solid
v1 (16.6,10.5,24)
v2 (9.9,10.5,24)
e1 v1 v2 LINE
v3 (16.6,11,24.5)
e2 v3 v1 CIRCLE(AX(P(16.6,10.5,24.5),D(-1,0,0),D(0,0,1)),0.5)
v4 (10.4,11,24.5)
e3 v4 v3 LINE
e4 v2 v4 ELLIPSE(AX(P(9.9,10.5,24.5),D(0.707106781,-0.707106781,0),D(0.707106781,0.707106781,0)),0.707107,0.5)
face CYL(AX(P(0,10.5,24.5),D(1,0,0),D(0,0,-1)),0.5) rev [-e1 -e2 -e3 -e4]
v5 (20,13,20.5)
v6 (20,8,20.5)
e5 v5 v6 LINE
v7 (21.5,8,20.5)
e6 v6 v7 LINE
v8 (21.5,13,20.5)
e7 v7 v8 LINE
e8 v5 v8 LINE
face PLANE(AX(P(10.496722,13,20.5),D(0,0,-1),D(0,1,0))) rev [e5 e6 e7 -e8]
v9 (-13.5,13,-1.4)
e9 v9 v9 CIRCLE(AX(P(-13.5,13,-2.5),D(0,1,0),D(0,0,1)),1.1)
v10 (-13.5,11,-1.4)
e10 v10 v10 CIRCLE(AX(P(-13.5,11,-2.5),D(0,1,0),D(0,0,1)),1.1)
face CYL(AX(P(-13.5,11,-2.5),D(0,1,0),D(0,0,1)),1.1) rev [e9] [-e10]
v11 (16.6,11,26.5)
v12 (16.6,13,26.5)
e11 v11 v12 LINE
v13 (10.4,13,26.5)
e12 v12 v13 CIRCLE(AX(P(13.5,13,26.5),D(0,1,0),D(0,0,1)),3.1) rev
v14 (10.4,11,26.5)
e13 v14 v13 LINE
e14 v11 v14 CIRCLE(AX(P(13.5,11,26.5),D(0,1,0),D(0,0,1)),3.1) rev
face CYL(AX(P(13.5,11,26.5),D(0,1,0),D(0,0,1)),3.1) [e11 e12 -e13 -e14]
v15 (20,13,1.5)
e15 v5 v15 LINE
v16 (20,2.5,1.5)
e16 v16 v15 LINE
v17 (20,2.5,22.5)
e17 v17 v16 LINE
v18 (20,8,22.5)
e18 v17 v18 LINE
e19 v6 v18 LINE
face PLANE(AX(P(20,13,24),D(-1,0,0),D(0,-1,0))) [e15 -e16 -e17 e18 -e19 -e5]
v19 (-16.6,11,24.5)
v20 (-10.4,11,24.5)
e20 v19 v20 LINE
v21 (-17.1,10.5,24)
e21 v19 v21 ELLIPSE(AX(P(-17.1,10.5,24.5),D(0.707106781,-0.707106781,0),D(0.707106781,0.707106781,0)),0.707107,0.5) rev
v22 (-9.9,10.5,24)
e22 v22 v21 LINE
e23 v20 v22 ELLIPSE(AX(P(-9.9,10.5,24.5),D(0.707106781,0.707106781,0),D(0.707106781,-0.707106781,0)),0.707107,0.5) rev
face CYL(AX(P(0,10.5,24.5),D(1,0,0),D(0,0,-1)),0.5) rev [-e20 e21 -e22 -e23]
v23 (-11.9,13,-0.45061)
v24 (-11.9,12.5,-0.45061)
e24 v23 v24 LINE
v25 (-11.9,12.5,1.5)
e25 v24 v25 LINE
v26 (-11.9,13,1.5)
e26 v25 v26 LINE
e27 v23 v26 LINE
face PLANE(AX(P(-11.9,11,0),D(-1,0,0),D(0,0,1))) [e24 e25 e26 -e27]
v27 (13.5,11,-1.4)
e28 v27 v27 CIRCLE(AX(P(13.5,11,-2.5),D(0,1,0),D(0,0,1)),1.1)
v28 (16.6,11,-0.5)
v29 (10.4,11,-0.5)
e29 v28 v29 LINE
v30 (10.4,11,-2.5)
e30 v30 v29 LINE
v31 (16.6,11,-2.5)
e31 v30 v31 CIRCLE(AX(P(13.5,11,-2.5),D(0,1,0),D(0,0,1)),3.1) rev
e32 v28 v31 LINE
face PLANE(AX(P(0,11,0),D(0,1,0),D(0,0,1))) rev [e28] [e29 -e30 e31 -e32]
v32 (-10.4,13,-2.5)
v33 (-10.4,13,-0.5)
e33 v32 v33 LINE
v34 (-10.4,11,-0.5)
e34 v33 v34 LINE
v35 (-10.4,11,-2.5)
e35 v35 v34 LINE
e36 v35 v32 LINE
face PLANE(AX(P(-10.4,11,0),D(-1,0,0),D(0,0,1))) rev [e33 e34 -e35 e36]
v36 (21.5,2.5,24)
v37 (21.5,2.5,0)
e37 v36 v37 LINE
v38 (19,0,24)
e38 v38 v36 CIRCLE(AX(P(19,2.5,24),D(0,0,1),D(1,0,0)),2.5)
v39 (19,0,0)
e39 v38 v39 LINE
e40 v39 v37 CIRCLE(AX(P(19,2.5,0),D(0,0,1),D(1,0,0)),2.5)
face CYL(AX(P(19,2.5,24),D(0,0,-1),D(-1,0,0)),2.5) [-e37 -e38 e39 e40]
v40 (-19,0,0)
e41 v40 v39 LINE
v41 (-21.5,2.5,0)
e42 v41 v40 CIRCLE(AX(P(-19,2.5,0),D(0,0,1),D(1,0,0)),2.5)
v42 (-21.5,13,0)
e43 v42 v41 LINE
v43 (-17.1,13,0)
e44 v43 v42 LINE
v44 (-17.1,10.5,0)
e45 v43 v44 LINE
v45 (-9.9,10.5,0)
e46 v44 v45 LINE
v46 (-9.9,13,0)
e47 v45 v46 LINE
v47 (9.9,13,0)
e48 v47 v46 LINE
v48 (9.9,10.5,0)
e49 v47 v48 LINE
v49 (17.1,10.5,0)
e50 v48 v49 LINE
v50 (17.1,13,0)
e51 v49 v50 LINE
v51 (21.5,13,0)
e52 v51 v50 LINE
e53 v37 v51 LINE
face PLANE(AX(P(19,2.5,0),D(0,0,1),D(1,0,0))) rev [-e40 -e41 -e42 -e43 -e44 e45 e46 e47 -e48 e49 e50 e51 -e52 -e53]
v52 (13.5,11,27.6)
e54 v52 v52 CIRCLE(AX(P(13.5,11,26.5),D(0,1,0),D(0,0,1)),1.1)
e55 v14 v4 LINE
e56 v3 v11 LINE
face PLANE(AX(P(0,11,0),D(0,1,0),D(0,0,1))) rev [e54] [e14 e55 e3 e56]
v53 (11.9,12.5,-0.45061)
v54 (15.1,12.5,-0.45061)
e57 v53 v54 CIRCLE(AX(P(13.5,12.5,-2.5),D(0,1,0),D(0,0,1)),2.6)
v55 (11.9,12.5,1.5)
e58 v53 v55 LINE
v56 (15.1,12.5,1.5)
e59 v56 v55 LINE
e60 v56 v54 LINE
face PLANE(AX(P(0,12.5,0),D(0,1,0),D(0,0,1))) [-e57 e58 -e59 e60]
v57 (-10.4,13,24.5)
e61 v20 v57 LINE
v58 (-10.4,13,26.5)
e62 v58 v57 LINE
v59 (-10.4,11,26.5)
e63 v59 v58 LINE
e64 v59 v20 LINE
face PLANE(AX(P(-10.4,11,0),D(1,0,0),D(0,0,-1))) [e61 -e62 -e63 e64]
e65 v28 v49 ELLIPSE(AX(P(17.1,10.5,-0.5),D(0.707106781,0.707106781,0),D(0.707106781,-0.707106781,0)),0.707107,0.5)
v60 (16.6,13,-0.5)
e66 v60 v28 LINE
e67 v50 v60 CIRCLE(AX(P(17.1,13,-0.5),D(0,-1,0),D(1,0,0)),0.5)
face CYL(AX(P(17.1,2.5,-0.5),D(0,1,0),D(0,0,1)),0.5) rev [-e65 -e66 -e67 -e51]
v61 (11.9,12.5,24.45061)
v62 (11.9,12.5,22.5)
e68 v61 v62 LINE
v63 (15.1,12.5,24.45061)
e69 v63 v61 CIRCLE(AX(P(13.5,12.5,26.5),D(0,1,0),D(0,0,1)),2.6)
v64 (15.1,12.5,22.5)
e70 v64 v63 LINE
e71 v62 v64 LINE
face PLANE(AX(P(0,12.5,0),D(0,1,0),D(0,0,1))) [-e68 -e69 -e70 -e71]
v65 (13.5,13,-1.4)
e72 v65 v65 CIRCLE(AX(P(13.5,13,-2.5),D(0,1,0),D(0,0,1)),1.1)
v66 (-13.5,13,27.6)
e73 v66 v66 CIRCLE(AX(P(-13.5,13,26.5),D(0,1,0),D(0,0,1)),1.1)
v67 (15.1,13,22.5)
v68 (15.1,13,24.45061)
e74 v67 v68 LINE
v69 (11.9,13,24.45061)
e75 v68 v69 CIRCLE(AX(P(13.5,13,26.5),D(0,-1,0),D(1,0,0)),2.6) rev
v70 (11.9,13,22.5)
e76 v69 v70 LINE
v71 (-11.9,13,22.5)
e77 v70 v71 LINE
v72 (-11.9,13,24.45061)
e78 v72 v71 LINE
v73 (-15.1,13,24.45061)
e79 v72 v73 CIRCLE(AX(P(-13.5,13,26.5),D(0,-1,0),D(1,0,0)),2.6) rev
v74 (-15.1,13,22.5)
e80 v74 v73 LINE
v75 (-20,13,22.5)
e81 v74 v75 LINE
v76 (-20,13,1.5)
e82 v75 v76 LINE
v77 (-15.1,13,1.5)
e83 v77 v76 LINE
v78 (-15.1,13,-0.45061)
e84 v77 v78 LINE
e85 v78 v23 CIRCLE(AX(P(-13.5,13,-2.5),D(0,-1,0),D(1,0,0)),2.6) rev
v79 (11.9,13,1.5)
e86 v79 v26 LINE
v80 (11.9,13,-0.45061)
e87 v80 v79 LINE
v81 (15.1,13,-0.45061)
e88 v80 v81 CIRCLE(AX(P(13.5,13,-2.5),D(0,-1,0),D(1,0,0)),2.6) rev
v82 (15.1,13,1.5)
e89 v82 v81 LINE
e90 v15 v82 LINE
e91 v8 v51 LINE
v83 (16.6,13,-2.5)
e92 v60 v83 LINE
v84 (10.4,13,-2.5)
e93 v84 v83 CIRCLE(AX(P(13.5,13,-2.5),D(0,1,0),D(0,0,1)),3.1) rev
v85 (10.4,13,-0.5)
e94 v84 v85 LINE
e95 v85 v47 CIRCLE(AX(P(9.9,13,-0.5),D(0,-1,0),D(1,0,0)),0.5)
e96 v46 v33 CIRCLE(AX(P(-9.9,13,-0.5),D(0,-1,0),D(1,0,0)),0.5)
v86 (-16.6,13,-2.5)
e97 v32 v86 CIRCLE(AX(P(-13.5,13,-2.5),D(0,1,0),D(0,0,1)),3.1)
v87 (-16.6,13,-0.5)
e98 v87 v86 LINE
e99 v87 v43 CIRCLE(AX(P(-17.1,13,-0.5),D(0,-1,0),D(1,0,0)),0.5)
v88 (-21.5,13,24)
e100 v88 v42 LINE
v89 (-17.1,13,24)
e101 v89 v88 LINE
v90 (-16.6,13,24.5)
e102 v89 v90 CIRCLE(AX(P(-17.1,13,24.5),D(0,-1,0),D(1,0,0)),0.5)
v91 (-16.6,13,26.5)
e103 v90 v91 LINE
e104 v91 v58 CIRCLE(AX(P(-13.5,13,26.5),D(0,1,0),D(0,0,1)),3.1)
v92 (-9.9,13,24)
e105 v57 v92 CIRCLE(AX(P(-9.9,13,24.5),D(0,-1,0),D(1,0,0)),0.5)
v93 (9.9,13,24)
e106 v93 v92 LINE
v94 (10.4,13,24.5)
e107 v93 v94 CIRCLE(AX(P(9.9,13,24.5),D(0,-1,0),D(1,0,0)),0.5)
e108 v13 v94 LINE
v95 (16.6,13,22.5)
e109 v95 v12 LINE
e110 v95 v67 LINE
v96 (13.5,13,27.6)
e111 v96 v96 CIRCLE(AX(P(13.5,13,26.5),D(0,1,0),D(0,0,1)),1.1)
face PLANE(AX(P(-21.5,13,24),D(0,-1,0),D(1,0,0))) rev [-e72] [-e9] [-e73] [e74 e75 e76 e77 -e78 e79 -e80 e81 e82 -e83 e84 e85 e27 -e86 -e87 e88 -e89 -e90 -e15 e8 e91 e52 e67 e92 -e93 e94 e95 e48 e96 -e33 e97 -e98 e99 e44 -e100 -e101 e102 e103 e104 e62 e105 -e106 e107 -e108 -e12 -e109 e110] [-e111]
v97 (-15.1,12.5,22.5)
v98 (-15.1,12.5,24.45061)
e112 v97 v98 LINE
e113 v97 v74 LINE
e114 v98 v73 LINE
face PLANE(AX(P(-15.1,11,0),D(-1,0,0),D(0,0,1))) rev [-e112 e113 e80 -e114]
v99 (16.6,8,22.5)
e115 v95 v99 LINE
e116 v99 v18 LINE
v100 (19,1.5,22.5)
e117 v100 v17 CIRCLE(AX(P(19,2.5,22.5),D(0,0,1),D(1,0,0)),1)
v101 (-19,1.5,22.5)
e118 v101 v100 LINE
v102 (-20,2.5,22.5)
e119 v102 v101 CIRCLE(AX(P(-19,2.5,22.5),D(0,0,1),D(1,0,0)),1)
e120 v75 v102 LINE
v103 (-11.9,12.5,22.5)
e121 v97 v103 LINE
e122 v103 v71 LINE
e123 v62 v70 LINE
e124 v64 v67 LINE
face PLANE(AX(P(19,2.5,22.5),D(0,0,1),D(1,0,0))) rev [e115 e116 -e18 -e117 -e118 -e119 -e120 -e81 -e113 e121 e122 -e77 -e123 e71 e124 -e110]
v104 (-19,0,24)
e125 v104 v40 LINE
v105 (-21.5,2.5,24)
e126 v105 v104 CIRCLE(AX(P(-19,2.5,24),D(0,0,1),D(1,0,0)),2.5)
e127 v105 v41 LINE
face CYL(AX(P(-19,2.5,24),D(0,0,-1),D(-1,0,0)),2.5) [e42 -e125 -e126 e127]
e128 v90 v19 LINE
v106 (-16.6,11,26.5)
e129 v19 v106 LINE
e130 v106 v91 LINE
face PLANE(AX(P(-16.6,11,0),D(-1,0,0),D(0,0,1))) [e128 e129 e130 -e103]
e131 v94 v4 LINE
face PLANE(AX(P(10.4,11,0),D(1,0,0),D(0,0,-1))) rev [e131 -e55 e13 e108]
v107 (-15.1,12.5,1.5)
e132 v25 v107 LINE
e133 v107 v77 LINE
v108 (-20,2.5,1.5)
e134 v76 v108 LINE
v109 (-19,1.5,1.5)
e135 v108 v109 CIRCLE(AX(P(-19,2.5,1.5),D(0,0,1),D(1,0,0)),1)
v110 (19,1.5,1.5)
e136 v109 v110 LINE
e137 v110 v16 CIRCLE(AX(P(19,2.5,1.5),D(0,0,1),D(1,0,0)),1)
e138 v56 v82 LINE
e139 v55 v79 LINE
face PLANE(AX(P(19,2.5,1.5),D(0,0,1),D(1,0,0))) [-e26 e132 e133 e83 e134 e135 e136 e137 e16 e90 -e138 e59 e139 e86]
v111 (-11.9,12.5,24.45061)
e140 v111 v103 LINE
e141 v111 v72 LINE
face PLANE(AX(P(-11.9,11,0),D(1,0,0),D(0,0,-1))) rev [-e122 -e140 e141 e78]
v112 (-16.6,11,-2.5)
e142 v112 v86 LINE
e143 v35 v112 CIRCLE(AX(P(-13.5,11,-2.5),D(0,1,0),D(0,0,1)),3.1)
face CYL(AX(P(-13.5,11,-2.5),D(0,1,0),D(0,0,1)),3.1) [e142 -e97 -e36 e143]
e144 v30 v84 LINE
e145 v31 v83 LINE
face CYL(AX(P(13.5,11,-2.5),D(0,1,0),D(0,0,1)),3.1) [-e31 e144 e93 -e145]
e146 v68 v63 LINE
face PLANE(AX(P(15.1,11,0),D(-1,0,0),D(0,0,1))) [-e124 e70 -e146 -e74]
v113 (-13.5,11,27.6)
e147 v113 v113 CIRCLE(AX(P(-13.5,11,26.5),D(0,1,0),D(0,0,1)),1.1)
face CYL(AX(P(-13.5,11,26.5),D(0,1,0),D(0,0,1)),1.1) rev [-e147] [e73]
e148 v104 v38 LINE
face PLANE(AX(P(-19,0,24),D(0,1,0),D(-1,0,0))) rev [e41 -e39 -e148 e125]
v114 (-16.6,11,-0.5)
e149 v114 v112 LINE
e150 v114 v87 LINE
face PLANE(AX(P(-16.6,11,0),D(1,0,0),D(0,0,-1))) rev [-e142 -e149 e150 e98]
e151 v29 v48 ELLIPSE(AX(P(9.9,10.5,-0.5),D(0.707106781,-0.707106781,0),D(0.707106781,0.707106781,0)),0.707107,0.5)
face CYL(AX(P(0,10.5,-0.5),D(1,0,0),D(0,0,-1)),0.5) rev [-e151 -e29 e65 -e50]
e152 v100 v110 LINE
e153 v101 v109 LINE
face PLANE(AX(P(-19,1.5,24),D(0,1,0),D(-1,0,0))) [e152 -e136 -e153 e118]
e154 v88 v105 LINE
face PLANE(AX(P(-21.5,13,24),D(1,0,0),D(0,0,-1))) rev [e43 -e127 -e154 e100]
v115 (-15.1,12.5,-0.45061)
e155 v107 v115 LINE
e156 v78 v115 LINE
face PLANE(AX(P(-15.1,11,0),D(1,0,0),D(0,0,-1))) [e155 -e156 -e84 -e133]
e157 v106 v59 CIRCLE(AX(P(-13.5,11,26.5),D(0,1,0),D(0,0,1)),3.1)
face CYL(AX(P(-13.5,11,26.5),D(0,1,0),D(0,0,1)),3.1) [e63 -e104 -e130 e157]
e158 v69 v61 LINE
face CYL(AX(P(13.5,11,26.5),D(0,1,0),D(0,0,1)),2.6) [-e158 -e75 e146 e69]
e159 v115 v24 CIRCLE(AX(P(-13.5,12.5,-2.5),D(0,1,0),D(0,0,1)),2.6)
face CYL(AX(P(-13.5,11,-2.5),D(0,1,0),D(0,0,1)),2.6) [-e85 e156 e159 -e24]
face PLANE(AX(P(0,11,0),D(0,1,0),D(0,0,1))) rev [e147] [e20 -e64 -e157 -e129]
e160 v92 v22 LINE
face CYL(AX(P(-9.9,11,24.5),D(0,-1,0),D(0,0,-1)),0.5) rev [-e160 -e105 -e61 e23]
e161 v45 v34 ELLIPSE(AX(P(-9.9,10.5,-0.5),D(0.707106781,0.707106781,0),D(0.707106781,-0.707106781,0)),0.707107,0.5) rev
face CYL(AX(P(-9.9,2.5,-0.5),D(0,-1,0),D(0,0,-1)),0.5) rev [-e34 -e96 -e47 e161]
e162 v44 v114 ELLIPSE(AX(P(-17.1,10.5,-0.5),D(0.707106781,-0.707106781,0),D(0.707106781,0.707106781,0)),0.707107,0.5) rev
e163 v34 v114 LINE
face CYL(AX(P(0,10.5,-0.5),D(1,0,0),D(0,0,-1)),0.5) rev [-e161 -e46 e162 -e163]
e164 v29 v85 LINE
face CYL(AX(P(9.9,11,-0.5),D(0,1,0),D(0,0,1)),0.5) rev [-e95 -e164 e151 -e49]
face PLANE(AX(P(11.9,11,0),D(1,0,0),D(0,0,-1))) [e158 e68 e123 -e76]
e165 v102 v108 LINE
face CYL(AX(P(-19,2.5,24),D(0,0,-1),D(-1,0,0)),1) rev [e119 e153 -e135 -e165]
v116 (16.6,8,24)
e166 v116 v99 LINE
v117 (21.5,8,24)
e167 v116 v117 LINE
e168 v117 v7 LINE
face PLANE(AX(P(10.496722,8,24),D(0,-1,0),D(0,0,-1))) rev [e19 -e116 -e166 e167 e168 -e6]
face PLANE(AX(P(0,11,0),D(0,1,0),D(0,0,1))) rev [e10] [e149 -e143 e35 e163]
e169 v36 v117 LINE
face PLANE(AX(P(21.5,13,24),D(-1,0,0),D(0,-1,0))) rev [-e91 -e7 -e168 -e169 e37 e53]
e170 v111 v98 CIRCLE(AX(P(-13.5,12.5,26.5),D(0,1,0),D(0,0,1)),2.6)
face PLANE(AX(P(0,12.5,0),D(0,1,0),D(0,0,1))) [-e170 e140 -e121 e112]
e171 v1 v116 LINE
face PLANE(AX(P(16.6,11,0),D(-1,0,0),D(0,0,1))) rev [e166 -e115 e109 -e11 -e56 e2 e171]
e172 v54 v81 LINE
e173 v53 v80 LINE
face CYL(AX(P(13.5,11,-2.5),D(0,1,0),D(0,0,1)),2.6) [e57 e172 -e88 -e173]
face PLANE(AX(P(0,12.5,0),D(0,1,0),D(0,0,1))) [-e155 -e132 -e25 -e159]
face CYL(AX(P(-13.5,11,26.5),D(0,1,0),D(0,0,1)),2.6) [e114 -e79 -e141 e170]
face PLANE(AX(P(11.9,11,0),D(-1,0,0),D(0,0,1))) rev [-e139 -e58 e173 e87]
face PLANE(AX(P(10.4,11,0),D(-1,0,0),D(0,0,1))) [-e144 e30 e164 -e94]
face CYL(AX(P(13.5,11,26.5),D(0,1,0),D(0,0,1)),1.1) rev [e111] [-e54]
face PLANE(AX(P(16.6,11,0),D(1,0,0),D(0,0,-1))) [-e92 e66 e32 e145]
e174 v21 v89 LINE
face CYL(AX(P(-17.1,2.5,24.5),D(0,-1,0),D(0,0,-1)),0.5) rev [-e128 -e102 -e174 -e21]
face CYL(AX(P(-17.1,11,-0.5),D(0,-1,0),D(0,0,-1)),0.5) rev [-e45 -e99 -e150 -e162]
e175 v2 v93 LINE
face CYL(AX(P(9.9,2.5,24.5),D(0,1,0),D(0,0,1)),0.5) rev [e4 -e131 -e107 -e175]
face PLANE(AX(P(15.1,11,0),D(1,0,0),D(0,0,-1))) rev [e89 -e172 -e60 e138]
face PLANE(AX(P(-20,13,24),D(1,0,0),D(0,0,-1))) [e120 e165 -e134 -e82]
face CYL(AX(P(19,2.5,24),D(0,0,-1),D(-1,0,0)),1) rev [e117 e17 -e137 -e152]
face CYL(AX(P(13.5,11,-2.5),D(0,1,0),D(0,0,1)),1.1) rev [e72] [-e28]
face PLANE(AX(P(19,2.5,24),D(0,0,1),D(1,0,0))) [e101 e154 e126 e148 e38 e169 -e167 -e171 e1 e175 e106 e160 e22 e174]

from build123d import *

# Parameters (mm, degrees)
BOSS_EXTRUDE1_DEPTH = 24
SKETCH3_R           = 1.1
BOSS_EXTRUDE6_DEPTH = 2
SHELL1_START        = 2.5
SHELL1_OUTLINE_W    = 40
SHELL1_OUTLINE_H    = 21
SHELL1_DEPTH        = 10.5
SHELL1_START_2      = 12.5
SHELL1_2_DEPTH      = 0.5
SHELL1_START_3      = 1.5
SHELL1_3_DEPTH      = 21
CUT_EXTRUDE1_START  = 16.6
SKETCH5_W           = 3.5
SKETCH5_H           = 5
CUT_EXTRUDE1_DEPTH  = 4.9
FILLET1_R           = 0.5


with BuildPart() as part:
    # Sketch1 → Boss-Extrude1 (new body)
    with BuildSketch(Plane.XY):
        with BuildLine():
            Line((-21.5, 13), (21.5, 13))
            Line((21.5, 13), (21.5, 2.5))
            ThreePointArc((21.5, 2.5), (20.767766953, 0.732233047), (19, 0))
            Line((19, 0), (-19, 0))
            ThreePointArc((-19, 0), (-20.767766953, 0.732233047), (-21.5, 2.5))
            Line((-21.5, 2.5), (-21.5, 13))
        make_face()
    extrude(amount=BOSS_EXTRUDE1_DEPTH)

    # Sketch3 → Boss-Extrude6 (add)
    # profile 1 of 4: a face of its own
    with BuildSketch(Plane(origin=(0, 13, 0), x_dir=(-1, 0, 0), z_dir=(0, 1, 0))):
        with BuildLine():
            Line((16.6, 0), (10.4, 0))
            Line((10.4, 0), (10.4, -2.5))
            ThreePointArc((10.4, -2.5), (13.5, -5.6), (16.6, -2.5))
            Line((16.6, -2.5), (16.6, 0))
        make_face()
        with Locations(Location((13.5, -2.5, 0), (0, 0, 90))):
            Circle(SKETCH3_R, mode=Mode.SUBTRACT)
    # profile 2 of 4: a face of its own
    with BuildSketch(Plane(origin=(0, 13, 0), x_dir=(-1, 0, 0), z_dir=(0, 1, 0))):
        with BuildLine():
            Line((-10.4, 0), (-16.6, 0))
            Line((-16.6, 0), (-16.6, -2.5))
            ThreePointArc((-16.6, -2.5), (-13.5, -5.6), (-10.4, -2.5))
            Line((-10.4, -2.5), (-10.4, 0))
        make_face()
        with Locations(Location((-13.5, -2.5, 0), (0, 0, 90))):
            Circle(SKETCH3_R, mode=Mode.SUBTRACT)
    # profile 3 of 4: a face of its own
    with BuildSketch(Plane(origin=(0, 13, 0), x_dir=(-1, 0, 0), z_dir=(0, 1, 0))):
        with BuildLine():
            Line((-16.6, 26.5), (-16.6, 24))
            Line((-16.6, 24), (-10.4, 24))
            Line((-10.4, 24), (-10.4, 26.5))
            ThreePointArc((-10.4, 26.5), (-13.5, 29.6), (-16.6, 26.5))
        make_face()
        with Locations(Location((-13.5, 26.5, 0), (0, 0, 90))):
            Circle(SKETCH3_R, mode=Mode.SUBTRACT)
    # profile 4 of 4: a face of its own
    with BuildSketch(Plane(origin=(0, 13, 0), x_dir=(-1, 0, 0), z_dir=(0, 1, 0))):
        with BuildLine():
            Line((10.4, 26.5), (10.4, 24))
            Line((10.4, 24), (16.6, 24))
            Line((16.6, 24), (16.6, 26.5))
            ThreePointArc((16.6, 26.5), (13.5, 29.6), (10.4, 26.5))
        make_face()
        with Locations(Location((13.5, 26.5, 0), (0, 0, 90))):
            Circle(SKETCH3_R, mode=Mode.SUBTRACT)
    extrude(amount=-BOSS_EXTRUDE6_DEPTH)

    # Shell1: read off the stored shape, not the designer's step
    # Shell1 outline → Shell1 (cut)
    with BuildSketch(Plane(origin=(0, 0, 0), x_dir=(1, 0, 0), z_dir=(0, 1, 0)).offset(SHELL1_START)):
        with Locations((0, -12)):
            Rectangle(SHELL1_OUTLINE_W, SHELL1_OUTLINE_H)
    extrude(amount=SHELL1_DEPTH, mode=Mode.SUBTRACT)

    # Shell1 2 outline → Shell1 2 (cut)
    with BuildSketch(Plane(origin=(0, 0, 0), x_dir=(1, 0, 0), z_dir=(0, 1, 0)).offset(SHELL1_START_2)):
        with BuildLine():
            Line((-15.1, 0.450609847), (-15.1, -1.5))
            Line((-15.1, -1.5), (-11.9, -1.5))
            Line((-11.9, -1.5), (-11.9, 0.450609847))
            ThreePointArc((-11.9, 0.450609847), (-13.5, -0.1), (-15.1, 0.450609847))
        make_face()
        with BuildLine():
            Line((-11.9, -22.5), (-15.1, -22.5))
            Line((-15.1, -22.5), (-15.1, -24.450609847))
            ThreePointArc((-15.1, -24.450609847), (-13.5, -23.9), (-11.9, -24.450609847))
            Line((-11.9, -24.450609847), (-11.9, -22.5))
        make_face()
        with BuildLine():
            Line((11.9, 0.450609847), (11.9, -1.5))
            Line((11.9, -1.5), (15.1, -1.5))
            Line((15.1, -1.5), (15.1, 0.450609847))
            ThreePointArc((15.1, 0.450609847), (13.5, -0.1), (11.9, 0.450609847))
        make_face()
        with BuildLine():
            Line((15.1, -22.5), (11.9, -22.5))
            Line((11.9, -22.5), (11.9, -24.450609847))
            ThreePointArc((11.9, -24.450609847), (13.5, -23.9), (15.1, -24.450609847))
            Line((15.1, -24.450609847), (15.1, -22.5))
        make_face()
    extrude(amount=SHELL1_2_DEPTH, mode=Mode.SUBTRACT)

    # Shell1 3 outline → Shell1 3 (cut)
    with BuildSketch(Plane.XY.offset(SHELL1_START_3)):
        with BuildLine():
            ThreePointArc((19, 1.5), (19.707106781, 1.792893219), (20, 2.5))
            Line((20, 2.5), (-20, 2.5))
            ThreePointArc((-20, 2.5), (-19.707106781, 1.792893219), (-19, 1.5))
            Line((-19, 1.5), (19, 1.5))
        make_face()
    extrude(amount=SHELL1_3_DEPTH, mode=Mode.SUBTRACT)

    # Sketch5 → Cut-Extrude1 (cut)
    with BuildSketch(Plane(origin=(0, 0, 0), x_dir=(0, 0, -1), z_dir=(1, 0, 0)).offset(CUT_EXTRUDE1_START)):
        with Locations((-22.25, 10.5)):
            Rectangle(SKETCH5_W, SKETCH5_H)
    extrude(amount=CUT_EXTRUDE1_DEPTH, mode=Mode.SUBTRACT)

    # Fillet1
    fillet1_edges = [part.edges().sort_by_distance(p)[0] for p in [
        (-10.4, 12, 24),
        (-16.6, 12, 24),
        (10.4, 12, 24),
        (10.4, 12, 0),
        (16.6, 12, 0),
        (-10.4, 12, 0),
        (-16.6, 12, 0),
        (13.5, 11, 0),
        (-13.5, 11, 0),
        (13.5, 11, 24),
        (-13.5, 11, 24),
    ]]
    fillet(fillet1_edges, radius=FILLET1_R)


solid = part.part
